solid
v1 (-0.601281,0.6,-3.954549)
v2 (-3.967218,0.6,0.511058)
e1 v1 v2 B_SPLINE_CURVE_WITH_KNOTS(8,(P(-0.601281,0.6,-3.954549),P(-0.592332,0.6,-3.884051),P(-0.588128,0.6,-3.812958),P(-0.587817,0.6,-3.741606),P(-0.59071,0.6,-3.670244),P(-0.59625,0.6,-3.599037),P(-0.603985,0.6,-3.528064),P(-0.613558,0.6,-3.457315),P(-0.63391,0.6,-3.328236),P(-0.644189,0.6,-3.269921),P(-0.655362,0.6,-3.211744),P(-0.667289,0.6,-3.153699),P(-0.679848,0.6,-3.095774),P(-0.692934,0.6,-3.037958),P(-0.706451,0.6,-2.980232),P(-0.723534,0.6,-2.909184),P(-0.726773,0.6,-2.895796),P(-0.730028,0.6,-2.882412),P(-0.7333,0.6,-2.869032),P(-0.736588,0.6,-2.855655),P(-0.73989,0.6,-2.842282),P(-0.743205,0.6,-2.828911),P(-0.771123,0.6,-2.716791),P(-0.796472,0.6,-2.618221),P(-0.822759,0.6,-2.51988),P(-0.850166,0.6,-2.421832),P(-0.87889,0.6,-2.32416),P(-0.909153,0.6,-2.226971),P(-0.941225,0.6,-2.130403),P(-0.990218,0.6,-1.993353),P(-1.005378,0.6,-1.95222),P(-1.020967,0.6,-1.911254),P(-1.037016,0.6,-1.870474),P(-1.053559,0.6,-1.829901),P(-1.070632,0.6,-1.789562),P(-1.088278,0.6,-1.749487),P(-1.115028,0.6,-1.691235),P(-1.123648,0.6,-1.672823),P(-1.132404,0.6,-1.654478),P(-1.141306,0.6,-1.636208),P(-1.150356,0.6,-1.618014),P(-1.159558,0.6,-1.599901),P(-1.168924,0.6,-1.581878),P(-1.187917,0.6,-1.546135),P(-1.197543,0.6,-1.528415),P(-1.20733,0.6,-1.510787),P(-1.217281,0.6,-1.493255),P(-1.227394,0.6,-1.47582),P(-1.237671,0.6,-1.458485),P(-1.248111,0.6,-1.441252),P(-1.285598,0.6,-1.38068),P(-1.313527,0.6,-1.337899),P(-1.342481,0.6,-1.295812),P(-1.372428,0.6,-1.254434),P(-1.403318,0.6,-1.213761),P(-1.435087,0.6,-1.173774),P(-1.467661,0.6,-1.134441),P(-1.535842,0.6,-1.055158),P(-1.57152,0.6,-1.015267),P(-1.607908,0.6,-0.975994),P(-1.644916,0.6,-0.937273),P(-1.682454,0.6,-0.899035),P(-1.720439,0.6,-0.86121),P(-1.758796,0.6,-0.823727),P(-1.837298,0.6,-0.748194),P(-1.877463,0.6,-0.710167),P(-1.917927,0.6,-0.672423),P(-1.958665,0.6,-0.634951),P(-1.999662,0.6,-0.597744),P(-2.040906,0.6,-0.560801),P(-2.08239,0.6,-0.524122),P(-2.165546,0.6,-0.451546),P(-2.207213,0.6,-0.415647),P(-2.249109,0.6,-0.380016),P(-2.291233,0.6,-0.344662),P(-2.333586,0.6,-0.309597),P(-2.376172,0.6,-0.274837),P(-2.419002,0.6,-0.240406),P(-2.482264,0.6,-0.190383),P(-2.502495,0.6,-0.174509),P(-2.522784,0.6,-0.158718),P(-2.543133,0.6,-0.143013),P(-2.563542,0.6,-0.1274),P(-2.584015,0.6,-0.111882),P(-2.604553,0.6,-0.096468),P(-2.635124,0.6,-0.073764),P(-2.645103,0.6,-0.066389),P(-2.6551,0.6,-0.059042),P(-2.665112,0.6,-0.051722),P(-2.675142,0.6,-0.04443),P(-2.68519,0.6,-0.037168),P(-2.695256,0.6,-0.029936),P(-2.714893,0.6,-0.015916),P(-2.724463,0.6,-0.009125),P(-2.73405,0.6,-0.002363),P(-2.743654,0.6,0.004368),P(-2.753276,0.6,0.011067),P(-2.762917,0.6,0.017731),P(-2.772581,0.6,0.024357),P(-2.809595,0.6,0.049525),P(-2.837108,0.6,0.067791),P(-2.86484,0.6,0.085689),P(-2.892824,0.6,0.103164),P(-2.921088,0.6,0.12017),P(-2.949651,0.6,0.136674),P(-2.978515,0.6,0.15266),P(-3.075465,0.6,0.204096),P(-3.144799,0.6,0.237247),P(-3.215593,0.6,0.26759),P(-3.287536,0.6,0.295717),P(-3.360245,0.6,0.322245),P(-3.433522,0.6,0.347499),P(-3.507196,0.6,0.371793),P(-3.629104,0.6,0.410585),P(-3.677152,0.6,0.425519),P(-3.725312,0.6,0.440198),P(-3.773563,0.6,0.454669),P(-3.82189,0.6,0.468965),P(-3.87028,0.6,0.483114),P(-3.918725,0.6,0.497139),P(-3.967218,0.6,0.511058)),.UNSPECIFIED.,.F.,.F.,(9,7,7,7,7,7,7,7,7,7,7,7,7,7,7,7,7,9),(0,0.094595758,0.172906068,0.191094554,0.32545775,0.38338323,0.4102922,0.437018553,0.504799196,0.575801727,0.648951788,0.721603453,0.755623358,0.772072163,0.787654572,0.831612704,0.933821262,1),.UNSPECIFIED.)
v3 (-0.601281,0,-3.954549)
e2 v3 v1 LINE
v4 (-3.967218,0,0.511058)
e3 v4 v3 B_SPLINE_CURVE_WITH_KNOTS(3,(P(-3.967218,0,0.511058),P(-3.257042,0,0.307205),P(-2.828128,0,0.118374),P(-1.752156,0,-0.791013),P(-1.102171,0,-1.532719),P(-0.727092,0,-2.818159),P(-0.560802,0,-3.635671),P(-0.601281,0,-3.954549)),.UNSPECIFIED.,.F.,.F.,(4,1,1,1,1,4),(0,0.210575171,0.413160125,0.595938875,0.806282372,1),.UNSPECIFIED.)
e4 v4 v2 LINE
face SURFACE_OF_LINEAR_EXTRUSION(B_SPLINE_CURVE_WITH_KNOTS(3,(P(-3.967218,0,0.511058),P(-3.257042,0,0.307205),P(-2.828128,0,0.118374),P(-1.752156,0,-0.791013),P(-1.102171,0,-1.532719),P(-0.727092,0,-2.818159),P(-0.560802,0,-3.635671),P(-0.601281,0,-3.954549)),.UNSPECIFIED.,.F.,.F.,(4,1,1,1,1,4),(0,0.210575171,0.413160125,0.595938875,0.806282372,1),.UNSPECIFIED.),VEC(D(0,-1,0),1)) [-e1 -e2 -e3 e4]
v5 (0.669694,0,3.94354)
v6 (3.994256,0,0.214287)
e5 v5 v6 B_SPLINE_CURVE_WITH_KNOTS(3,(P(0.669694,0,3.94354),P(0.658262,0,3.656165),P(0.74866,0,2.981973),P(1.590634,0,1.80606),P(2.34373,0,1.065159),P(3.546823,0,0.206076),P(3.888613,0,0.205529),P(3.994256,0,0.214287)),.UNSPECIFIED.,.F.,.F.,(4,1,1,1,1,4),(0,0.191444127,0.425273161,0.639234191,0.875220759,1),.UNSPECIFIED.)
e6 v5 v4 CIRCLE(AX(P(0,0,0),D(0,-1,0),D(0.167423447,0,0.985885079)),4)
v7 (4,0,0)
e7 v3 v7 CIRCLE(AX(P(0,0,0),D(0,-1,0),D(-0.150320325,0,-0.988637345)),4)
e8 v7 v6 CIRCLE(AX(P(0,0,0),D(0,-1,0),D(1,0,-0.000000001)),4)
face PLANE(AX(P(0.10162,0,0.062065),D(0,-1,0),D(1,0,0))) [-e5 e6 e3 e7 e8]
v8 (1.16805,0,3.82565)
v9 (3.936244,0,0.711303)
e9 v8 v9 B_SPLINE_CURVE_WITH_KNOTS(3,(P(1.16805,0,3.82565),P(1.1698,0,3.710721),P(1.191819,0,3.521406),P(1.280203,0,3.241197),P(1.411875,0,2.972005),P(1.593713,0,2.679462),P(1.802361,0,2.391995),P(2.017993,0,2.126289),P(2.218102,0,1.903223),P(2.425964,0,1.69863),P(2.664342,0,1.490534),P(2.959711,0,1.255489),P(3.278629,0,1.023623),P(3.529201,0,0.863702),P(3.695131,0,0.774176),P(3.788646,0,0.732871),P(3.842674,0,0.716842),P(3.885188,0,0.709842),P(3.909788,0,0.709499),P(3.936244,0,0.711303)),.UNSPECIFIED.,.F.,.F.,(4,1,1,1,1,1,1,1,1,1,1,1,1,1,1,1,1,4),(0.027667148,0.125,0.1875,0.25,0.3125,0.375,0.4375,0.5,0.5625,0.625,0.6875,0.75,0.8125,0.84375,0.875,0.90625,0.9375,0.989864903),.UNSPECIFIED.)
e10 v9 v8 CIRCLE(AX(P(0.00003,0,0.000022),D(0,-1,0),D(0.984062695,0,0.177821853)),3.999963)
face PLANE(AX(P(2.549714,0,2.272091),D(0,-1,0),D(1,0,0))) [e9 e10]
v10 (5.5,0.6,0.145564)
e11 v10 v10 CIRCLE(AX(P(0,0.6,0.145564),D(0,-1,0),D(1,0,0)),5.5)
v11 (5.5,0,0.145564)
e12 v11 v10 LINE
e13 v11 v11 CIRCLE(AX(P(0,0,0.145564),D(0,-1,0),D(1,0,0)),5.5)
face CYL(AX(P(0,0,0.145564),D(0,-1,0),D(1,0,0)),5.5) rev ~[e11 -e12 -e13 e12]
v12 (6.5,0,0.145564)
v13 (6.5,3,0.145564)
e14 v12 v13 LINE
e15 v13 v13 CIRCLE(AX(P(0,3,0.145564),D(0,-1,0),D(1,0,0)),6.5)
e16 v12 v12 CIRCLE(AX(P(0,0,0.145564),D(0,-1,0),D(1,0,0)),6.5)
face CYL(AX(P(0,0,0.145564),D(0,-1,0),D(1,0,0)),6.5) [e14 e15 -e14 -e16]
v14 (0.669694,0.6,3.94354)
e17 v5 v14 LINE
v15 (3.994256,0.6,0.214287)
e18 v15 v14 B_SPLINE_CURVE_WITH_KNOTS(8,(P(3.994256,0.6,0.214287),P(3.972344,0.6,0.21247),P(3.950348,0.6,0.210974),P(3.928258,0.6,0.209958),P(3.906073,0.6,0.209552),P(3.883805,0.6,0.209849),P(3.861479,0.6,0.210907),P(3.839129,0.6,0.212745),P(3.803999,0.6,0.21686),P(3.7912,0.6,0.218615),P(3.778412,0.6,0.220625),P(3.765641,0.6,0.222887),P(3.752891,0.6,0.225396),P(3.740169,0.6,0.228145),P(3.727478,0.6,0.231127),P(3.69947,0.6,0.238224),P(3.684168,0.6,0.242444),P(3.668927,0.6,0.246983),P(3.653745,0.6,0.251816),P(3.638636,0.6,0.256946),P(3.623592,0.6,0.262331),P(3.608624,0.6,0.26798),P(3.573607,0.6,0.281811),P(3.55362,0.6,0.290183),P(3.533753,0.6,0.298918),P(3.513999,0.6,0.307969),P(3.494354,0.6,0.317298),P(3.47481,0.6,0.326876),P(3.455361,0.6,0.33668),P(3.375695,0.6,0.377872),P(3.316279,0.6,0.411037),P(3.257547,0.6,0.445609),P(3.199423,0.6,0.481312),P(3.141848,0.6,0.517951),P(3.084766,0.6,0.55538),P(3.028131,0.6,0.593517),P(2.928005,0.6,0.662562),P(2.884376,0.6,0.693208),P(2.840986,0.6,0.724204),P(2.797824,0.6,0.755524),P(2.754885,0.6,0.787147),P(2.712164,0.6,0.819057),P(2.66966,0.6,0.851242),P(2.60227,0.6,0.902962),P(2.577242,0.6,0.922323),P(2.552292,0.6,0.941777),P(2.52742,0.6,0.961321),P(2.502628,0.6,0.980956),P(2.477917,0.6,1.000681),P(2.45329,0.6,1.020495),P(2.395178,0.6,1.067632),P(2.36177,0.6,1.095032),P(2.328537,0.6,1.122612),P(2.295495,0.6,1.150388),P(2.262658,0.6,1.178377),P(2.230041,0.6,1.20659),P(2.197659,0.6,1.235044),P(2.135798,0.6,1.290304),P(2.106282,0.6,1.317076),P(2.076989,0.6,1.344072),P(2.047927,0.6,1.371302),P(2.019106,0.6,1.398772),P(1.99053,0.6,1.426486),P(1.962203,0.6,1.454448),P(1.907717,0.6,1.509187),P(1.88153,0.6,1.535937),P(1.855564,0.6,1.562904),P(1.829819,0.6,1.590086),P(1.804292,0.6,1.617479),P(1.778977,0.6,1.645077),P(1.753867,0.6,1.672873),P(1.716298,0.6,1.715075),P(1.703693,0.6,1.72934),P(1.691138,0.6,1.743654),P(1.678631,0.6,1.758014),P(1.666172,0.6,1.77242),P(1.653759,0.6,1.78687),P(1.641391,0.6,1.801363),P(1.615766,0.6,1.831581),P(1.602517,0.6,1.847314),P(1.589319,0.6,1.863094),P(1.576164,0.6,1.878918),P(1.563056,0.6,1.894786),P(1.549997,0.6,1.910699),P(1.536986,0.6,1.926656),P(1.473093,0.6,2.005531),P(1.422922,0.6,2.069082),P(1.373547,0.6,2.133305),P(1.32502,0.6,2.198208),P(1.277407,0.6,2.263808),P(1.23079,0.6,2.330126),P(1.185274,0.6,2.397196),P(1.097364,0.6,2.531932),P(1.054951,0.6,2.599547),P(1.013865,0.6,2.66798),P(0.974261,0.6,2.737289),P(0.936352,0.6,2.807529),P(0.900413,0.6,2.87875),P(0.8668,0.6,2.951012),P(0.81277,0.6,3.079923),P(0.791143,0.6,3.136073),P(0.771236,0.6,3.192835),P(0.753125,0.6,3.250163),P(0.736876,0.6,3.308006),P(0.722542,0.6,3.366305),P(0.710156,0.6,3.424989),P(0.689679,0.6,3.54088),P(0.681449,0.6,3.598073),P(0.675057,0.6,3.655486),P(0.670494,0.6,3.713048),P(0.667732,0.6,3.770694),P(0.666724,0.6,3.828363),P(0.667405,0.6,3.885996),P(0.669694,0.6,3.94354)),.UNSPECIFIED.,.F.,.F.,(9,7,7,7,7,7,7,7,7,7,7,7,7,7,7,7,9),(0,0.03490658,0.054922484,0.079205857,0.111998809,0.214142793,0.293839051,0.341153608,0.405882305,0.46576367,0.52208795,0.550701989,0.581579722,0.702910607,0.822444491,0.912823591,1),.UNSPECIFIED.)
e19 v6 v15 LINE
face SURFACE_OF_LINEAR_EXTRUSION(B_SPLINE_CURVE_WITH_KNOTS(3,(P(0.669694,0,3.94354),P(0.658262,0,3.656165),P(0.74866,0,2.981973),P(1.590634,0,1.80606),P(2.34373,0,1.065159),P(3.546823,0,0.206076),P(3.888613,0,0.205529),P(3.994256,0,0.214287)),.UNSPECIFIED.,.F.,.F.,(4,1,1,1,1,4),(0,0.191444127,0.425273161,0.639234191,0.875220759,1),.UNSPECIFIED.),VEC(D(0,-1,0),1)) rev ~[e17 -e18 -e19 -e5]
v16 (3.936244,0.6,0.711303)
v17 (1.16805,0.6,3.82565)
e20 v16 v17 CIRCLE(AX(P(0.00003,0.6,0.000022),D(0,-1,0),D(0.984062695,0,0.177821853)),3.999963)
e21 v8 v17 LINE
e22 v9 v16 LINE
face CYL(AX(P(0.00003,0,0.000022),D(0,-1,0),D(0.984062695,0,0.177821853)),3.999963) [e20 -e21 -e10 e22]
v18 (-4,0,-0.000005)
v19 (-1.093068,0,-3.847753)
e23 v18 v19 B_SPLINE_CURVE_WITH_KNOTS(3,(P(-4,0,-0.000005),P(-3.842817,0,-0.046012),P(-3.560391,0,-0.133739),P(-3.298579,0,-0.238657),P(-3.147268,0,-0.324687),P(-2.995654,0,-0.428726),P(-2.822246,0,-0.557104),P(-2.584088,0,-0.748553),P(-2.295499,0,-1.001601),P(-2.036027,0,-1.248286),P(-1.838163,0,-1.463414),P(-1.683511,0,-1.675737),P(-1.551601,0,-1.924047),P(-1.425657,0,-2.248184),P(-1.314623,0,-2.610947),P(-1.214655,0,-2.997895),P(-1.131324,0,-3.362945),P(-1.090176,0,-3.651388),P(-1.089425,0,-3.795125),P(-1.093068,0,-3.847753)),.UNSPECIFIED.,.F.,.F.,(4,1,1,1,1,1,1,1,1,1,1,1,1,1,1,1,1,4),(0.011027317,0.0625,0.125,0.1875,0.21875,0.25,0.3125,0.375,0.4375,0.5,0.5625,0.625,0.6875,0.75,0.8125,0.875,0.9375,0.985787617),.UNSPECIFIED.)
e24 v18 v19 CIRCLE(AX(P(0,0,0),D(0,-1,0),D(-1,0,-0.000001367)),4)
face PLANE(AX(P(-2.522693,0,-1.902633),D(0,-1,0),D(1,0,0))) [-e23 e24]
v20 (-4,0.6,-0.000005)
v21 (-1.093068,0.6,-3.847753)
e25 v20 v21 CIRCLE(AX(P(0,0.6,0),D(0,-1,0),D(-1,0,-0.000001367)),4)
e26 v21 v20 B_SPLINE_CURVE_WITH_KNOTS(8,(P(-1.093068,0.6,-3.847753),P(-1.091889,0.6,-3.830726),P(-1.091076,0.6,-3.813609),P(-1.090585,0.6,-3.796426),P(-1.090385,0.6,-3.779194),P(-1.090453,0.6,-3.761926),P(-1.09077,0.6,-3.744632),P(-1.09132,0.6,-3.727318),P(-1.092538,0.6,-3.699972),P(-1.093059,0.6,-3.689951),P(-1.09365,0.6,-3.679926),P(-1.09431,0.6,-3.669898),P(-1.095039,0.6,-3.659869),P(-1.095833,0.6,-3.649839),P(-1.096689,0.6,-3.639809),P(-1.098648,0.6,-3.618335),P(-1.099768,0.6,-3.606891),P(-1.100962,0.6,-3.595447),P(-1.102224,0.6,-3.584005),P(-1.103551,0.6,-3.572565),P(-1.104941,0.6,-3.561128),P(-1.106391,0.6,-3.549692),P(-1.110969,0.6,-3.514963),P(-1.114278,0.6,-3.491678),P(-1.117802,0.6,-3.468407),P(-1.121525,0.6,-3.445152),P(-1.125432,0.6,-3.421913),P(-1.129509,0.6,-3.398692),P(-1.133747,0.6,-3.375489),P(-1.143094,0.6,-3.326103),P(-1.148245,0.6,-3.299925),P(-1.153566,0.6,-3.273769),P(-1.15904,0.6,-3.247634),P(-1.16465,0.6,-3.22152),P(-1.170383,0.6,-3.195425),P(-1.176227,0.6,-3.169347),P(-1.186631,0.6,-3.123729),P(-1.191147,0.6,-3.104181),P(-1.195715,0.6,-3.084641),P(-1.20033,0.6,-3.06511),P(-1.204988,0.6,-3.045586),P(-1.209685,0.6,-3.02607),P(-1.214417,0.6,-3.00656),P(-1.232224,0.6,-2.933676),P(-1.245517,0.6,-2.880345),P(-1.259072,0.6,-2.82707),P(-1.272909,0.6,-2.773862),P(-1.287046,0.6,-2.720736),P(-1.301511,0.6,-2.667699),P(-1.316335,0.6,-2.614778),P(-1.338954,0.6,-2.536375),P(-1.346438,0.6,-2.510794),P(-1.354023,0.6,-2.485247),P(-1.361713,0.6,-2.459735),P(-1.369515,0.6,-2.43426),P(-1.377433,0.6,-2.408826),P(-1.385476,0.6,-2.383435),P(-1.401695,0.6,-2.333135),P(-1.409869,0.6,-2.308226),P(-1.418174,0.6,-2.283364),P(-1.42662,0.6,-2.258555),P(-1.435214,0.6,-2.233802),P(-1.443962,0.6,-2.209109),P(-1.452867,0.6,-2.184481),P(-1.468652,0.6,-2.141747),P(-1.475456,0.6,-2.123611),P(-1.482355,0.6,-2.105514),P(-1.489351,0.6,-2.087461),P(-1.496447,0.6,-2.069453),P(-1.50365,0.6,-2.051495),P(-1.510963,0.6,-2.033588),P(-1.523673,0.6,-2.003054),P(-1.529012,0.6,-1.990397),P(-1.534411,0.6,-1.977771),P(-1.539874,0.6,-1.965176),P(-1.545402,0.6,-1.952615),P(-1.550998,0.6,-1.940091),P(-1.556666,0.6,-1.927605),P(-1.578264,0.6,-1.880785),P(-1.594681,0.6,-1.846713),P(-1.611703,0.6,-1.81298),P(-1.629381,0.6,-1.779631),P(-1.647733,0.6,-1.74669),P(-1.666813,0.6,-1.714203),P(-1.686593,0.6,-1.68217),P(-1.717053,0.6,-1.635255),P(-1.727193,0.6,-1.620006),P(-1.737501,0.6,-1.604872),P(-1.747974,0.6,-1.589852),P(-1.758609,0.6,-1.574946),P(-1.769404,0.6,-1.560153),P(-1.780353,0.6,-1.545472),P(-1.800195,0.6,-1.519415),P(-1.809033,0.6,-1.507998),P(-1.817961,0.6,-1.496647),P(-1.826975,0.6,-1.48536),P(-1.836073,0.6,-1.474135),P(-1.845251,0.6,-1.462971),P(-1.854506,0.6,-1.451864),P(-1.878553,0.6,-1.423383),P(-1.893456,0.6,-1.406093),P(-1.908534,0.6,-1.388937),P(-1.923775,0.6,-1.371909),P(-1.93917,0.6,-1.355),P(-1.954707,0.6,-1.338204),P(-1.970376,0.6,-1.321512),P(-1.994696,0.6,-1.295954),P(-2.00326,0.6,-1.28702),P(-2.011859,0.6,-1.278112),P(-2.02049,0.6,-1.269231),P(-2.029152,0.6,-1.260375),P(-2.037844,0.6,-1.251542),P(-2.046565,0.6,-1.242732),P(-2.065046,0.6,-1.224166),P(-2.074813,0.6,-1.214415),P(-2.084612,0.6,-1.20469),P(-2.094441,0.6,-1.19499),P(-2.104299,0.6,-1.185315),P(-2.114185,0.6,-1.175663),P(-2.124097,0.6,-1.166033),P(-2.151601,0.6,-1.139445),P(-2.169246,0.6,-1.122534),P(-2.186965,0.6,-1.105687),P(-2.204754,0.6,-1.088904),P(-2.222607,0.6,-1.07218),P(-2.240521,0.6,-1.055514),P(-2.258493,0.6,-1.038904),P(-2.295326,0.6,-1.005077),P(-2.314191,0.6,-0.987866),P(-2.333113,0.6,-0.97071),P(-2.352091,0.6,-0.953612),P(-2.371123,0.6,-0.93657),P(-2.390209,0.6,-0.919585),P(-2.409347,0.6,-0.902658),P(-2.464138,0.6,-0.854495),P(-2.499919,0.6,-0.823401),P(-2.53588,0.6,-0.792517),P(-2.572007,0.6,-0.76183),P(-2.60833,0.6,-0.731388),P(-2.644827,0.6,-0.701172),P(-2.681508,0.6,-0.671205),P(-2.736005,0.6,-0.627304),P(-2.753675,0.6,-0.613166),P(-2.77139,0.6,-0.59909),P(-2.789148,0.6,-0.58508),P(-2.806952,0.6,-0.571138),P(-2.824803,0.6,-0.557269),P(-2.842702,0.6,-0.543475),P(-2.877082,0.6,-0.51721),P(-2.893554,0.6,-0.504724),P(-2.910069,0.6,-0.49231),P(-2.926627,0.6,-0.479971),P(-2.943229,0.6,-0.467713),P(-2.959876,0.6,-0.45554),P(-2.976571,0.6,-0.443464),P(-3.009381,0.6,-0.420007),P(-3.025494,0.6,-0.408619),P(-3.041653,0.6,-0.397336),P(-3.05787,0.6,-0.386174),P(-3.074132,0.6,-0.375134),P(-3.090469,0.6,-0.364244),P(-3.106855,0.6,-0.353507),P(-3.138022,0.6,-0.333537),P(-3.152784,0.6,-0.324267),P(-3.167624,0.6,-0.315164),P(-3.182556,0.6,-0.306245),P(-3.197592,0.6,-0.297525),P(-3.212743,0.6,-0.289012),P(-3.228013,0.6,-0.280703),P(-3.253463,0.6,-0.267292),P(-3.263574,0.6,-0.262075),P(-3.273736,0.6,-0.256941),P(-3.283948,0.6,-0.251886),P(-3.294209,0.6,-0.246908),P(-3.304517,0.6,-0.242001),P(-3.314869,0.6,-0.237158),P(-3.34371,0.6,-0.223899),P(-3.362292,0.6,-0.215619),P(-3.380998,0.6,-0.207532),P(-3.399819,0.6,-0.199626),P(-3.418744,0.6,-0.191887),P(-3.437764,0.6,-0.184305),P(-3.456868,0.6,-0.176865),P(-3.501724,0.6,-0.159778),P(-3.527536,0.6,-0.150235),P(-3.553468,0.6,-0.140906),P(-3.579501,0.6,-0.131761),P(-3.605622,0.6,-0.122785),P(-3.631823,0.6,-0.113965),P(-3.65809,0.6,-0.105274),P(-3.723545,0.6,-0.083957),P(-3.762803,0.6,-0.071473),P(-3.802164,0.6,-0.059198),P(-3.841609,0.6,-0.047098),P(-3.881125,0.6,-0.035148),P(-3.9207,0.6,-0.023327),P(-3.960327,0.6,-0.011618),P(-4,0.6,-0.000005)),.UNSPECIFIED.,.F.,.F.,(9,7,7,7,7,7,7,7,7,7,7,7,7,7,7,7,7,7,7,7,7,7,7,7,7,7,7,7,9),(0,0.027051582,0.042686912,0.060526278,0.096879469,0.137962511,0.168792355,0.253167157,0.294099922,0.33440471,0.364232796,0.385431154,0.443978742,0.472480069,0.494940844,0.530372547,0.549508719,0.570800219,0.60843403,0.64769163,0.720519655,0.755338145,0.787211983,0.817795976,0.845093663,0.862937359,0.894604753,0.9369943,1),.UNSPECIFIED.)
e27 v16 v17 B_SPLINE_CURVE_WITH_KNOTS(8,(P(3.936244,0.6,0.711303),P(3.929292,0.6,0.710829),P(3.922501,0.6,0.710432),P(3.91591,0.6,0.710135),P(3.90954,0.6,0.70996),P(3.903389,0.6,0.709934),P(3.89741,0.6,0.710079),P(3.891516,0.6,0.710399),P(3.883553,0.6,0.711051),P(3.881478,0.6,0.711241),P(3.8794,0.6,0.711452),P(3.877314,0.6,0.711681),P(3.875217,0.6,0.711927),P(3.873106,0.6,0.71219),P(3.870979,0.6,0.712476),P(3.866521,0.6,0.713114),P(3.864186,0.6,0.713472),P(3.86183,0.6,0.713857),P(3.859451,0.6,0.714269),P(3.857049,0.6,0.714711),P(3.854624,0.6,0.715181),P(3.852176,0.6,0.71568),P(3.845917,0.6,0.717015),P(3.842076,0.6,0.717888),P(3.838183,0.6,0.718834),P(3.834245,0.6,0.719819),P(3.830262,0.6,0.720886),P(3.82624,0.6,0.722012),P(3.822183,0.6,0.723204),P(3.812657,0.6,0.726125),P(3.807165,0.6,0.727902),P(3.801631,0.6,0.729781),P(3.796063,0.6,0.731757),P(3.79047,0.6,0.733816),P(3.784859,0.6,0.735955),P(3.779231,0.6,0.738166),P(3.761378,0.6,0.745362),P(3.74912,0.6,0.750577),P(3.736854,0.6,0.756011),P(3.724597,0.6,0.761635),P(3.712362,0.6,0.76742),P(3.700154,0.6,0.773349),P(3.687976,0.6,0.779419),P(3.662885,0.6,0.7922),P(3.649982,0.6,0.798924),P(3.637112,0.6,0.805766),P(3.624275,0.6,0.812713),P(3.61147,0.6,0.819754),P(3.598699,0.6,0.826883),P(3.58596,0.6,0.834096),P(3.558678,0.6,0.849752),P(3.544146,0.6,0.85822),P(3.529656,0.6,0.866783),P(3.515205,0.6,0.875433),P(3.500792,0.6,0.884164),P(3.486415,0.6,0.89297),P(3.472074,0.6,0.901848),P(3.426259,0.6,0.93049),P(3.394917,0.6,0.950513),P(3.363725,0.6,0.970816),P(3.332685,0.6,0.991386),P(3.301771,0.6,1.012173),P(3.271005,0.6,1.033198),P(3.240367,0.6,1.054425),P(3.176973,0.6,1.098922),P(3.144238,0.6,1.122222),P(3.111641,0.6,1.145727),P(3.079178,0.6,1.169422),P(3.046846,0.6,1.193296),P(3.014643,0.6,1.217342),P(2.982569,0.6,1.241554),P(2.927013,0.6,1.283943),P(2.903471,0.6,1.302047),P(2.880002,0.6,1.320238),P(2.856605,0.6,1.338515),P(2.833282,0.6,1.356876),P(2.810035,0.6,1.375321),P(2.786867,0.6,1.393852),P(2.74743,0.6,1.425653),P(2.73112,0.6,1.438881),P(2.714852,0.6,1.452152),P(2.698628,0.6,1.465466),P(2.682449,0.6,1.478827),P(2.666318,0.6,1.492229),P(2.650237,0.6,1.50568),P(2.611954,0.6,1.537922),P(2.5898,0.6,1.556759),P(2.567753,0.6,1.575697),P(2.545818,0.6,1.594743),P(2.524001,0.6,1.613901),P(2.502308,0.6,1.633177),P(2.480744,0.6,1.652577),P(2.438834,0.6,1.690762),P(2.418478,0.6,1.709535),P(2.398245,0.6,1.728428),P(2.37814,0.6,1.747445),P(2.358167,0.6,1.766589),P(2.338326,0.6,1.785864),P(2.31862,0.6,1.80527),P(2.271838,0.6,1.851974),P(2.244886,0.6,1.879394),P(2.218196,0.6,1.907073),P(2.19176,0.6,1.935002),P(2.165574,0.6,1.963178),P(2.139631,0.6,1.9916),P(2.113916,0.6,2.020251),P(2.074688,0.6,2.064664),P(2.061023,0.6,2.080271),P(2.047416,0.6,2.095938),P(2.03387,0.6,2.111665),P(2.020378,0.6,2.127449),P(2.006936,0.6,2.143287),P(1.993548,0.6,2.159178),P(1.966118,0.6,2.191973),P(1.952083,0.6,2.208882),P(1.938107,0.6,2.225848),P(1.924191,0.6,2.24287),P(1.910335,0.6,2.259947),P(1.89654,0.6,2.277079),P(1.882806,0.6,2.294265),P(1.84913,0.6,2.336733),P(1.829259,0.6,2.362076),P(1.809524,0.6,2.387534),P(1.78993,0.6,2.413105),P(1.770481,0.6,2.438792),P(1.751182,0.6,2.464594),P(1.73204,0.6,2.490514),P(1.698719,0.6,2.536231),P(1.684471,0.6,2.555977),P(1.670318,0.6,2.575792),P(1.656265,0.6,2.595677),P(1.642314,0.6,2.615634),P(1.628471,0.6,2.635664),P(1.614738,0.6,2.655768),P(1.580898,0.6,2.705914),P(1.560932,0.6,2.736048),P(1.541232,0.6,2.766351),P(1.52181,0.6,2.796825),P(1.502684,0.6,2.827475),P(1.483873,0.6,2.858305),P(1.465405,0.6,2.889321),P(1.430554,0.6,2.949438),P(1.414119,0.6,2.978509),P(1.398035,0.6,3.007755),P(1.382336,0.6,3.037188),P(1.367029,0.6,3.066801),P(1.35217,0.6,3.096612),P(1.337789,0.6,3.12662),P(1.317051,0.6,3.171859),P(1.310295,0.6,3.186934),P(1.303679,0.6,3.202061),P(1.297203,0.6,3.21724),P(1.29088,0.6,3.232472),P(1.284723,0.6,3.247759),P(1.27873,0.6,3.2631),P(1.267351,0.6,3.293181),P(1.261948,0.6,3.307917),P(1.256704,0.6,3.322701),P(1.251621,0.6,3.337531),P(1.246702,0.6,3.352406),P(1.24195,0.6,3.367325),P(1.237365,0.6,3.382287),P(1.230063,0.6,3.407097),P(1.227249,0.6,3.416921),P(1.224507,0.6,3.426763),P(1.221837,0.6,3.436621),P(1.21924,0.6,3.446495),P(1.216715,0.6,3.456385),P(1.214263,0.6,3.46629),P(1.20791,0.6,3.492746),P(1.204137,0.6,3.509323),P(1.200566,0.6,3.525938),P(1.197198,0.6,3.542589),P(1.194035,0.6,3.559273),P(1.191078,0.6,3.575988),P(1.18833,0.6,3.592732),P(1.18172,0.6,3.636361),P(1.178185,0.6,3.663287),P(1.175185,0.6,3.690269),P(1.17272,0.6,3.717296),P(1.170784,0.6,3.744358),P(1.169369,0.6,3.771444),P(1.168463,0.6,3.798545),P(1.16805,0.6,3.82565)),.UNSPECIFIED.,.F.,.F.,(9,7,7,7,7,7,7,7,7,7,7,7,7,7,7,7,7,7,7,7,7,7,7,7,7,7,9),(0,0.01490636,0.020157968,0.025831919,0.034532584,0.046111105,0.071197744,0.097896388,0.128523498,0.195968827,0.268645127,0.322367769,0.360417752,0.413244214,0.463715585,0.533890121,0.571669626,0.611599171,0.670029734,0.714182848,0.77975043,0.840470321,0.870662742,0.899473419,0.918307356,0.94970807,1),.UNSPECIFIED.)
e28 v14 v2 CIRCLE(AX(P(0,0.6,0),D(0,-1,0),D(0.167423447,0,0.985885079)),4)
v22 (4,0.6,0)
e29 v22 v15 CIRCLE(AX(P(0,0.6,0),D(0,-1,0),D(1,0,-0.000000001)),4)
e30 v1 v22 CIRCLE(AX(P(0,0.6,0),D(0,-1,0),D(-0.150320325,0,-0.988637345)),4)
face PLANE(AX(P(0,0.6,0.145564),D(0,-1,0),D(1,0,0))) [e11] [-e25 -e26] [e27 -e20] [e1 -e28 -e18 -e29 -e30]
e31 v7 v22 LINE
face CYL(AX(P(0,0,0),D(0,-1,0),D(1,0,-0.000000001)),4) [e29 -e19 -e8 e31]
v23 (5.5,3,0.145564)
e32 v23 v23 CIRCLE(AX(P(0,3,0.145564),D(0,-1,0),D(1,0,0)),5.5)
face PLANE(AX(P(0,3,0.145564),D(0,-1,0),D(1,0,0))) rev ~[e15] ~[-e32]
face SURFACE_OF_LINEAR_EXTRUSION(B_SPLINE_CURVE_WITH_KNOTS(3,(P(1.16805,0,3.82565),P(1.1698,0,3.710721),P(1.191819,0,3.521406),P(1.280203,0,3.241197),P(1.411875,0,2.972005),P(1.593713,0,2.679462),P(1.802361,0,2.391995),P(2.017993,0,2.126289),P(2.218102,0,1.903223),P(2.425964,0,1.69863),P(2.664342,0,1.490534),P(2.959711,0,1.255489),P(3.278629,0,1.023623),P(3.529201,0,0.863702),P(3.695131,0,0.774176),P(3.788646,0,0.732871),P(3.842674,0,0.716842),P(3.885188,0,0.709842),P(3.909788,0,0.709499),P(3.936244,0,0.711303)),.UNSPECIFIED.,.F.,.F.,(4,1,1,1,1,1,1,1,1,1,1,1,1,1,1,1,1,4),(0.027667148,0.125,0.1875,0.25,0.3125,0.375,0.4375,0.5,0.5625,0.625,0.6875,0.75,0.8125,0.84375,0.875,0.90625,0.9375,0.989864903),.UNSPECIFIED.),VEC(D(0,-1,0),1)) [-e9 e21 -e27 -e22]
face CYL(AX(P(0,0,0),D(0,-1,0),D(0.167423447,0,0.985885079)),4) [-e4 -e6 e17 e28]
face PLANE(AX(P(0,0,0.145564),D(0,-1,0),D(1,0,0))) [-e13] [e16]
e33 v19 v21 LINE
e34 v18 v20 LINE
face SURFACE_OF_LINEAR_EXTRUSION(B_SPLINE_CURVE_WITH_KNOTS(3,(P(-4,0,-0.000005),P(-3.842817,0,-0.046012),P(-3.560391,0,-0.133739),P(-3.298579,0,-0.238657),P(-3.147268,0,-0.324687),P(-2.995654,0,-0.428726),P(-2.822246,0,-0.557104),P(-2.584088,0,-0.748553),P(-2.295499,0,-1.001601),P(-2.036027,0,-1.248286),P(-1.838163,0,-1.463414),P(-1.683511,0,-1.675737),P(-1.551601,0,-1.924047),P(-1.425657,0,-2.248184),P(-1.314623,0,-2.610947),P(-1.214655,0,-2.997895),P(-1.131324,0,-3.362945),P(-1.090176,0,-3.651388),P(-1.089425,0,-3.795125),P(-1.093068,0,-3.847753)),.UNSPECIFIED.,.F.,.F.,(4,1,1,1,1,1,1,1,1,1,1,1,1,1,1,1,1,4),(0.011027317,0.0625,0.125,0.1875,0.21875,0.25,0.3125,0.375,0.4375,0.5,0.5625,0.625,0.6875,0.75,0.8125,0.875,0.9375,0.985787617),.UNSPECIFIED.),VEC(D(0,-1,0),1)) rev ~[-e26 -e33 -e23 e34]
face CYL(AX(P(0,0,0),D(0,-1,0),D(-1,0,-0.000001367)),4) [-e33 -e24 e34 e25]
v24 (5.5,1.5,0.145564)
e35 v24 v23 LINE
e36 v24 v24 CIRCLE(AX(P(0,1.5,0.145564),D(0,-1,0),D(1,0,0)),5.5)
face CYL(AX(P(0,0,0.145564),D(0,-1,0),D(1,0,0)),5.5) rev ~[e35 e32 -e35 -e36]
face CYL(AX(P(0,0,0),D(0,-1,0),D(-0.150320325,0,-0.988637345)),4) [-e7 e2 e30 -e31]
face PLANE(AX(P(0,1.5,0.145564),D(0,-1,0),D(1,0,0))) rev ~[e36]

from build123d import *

# Parameters (mm, degrees)
F1_R     = 6.5
F1_R_2   = 5.5
F3_DEPTH = 3
F4_DEPTH = 1.5
F5_DEPTH = 0.6
F6_DEPTH = 1
F7_DEPTH = 1
F8_DEPTH = 1


# Not quite as in the source:
# - ends of sketch curves that miss each other by under 0.0002 mm in the source are joined
# - the dataset's text gives a spline's control points without its knots; the knots are read off the source's solid


with BuildPart() as f3:
    # F1 (on Front) → F3 (new body)
    with BuildSketch(Plane.XZ):
        with Locations((1.996e-07, 0.145563783)):
            Circle(F1_R)
        with Locations((1.996e-07, 0.145563783)):
            Circle(F1_R_2, mode=Mode.SUBTRACT)
    extrude(amount=-F3_DEPTH)

    # F0 (on Front) + F1 (on Front) → F4 (join)
    with BuildSketch(Plane.XZ):
        with BuildLine():
            add(Edge.make_bspline(
                [(-1.4633628161, -3.8408698747), (-0.8618942381, -4.0797628795), (1.7775925035, -4.2725148883), (2.1266039699, -2.4883414841), (2.1792066492, -0.8570773415), (2.1261946367, 0.7652860278), (1.8591945487, 1.4152828688), (2.1073079889, 1.4090746613), (2.1070261206, 1.5973545621), (1.8482611221, 1.6571502022), (1.9106924097, 2.0013449435), (1.883292753, 2.4559971082), (1.4530608962, 2.5796008165), (1.3486705812, 2.982608362), (0.9522813685, 3.1051443516), (0.6376593936, 3.1670181532), (0.4331394013, 3.4063180529), (0.6426984155, 3.8176132891), (0.3981993423, 4.2634916825), (-0.0062082347, 4.3047771669), (-0.3006353253, 4.2313929361), (-0.6271454426, 3.9609581822), (-0.5601436399, 3.6082200906), (-0.4158755178, 3.3585569408), (-0.6804152796, 3.1141950016), (-1.0068060059, 3.1249120402), (-1.1963426018, 2.8920399235), (-1.3913162215, 2.8683333491), (-1.3804892819, 2.6236576239), (-1.7077578499, 2.7520009173), (-1.8276300328, 2.3206081403), (-1.8540486856, 2.0110635487), (-1.8641412125, 1.6986764558), (-2.1169141262, 1.6232767981), (-2.0818952059, 1.4062115725), (-1.9001690611, 1.4703026422), (-2.1146422172, 0.8809803752), (-2.0979861646, 0.2234423606), (-2.2011740498, -0.523800053), (-2.1724225003, -1.2230030424), (-2.1779022447, -2.5473945892), (-1.9120269544, -3.4285716282), (-1.7403824301, -3.7308424346), (-1.4633628161, -3.8408698747)],
                knots=[0, 0, 0, 0, 0.0614284178, 0.105210304, 0.1528188952, 0.1998934744, 0.2260159491, 0.2394622475, 0.2521789794, 0.2685961982, 0.2887254165, 0.3121716538, 0.3345624104, 0.3566054098, 0.3791085644, 0.3997521347, 0.4178904262, 0.4412373911, 0.4652934844, 0.487296569, 0.5074239254, 0.5296841222, 0.5504706917, 0.5687295132, 0.5882529988, 0.6087082105, 0.6278548545, 0.642595893, 0.6569229468, 0.674176944, 0.6961346625, 0.7176137944, 0.736576695, 0.7535032789, 0.767308469, 0.7778501968, 0.8029343179, 0.8341377518, 0.8649078271, 0.8956216456, 0.9374997946, 0.9717077879, 1, 1, 1, 1], degree=3))
        make_face()
    with BuildSketch(Plane.XZ):
        with Locations((1.996e-07, 0.145563783)):
            Circle(F1_R_2)
    extrude(amount=-F4_DEPTH)

    # F1 (on Front) + F0 (on Front) → F5 (cut)
    with BuildSketch(Plane.XZ):
        with Locations((1.996e-07, 0.145563783)):
            Circle(F1_R_2)
    with BuildSketch(Plane.XZ):
        with BuildLine():
            add(Edge.make_bspline(
                [(-1.4633628161, -3.8408698747), (-0.8618942381, -4.0797628795), (1.7775925035, -4.2725148883), (2.1266039699, -2.4883414841), (2.1792066492, -0.8570773415), (2.1261946367, 0.7652860278), (1.8591945487, 1.4152828688), (2.1073079889, 1.4090746613), (2.1070261206, 1.5973545621), (1.8482611221, 1.6571502022), (1.9106924097, 2.0013449435), (1.883292753, 2.4559971082), (1.4530608962, 2.5796008165), (1.3486705812, 2.982608362), (0.9522813685, 3.1051443516), (0.6376593936, 3.1670181532), (0.4331394013, 3.4063180529), (0.6426984155, 3.8176132891), (0.3981993423, 4.2634916825), (-0.0062082347, 4.3047771669), (-0.3006353253, 4.2313929361), (-0.6271454426, 3.9609581822), (-0.5601436399, 3.6082200906), (-0.4158755178, 3.3585569408), (-0.6804152796, 3.1141950016), (-1.0068060059, 3.1249120402), (-1.1963426018, 2.8920399235), (-1.3913162215, 2.8683333491), (-1.3804892819, 2.6236576239), (-1.7077578499, 2.7520009173), (-1.8276300328, 2.3206081403), (-1.8540486856, 2.0110635487), (-1.8641412125, 1.6986764558), (-2.1169141262, 1.6232767981), (-2.0818952059, 1.4062115725), (-1.9001690611, 1.4703026422), (-2.1146422172, 0.8809803752), (-2.0979861646, 0.2234423606), (-2.2011740498, -0.523800053), (-2.1724225003, -1.2230030424), (-2.1779022447, -2.5473945892), (-1.9120269544, -3.4285716282), (-1.7403824301, -3.7308424346), (-1.4633628161, -3.8408698747)],
                knots=[0, 0, 0, 0, 0.0614284178, 0.105210304, 0.1528188952, 0.1998934744, 0.2260159491, 0.2394622475, 0.2521789794, 0.2685961982, 0.2887254165, 0.3121716538, 0.3345624104, 0.3566054098, 0.3791085644, 0.3997521347, 0.4178904262, 0.4412373911, 0.4652934844, 0.487296569, 0.5074239254, 0.5296841222, 0.5504706917, 0.5687295132, 0.5882529988, 0.6087082105, 0.6278548545, 0.642595893, 0.6569229468, 0.674176944, 0.6961346625, 0.7176137944, 0.736576695, 0.7535032789, 0.767308469, 0.7778501968, 0.8029343179, 0.8341377518, 0.8649078271, 0.8956216456, 0.9374997946, 0.9717077879, 1, 1, 1, 1], degree=3))
        make_face()
    extrude(amount=-F5_DEPTH, mode=Mode.SUBTRACT)

    # F2 (on face) → F6 (join)
    with BuildSketch(Plane.XZ):
        with BuildLine():
            ThreePointArc((-0.6012813019, -3.9545493796), (2.6071895589, -3.0335725809), (4, 0))
            ThreePointArc((4, 0), (3.9985637458, 0.1071819529), (3.9942560145, 0.2142869356))
            add(Edge.make_bspline(
                [(0.6696937898, 3.9435403165), (0.6582621326, 3.6561648877), (0.748660393, 2.9819733395), (1.5906344476, 1.8060597163), (2.343729672, 1.0651587443), (3.5468225291, 0.2060757034), (3.8886131662, 0.2055288721), (3.9942560145, 0.2142869356)],
                knots=[0, 0, 0, 0, 0.1914441273, 0.4252731611, 0.6392341909, 0.8752207587, 1, 1, 1, 1], degree=3))
            ThreePointArc((0.6696937898, 3.9435403165), (-2.3798948862, 3.2149806112), (-3.9672180841, 0.5110583855))
            add(Edge.make_bspline(
                [(-3.9672180841, 0.5110583855), (-3.2570424953, 0.3072051337), (-2.8281277347, 0.1183736874), (-1.7521563519, -0.7910134795), (-1.1021707585, -1.5327189765), (-0.7270922455, -2.8181587186), (-0.5608016797, -3.6356710711), (-0.6012813019, -3.9545493796)],
                knots=[0, 0, 0, 0, 0.2105751714, 0.4131601255, 0.5959388752, 0.8062823722, 1, 1, 1, 1], degree=3))
        make_face()
    extrude(amount=-F6_DEPTH)

    # F2 (on face) → F7 (join)
    with BuildSketch(Plane.XZ):
        with BuildLine():
            ThreePointArc((-4, -5.4666e-06), (-3.1915709466, -2.4111978128), (-1.0930678122, -3.8477529492))
            add(Edge.make_bspline(
                [(-4, -5.4666e-06), (-3.8428166733, -0.0460123585), (-3.5603914777, -0.133738653), (-3.2985794295, -0.2386569495), (-3.1472677408, -0.3246867621), (-2.9956539452, -0.4287257802), (-2.8222463482, -0.557104318), (-2.5840878529, -0.7485534177), (-2.2954985412, -1.0016010876), (-2.036026908, -1.2482860637), (-1.8381629968, -1.4634144564), (-1.6835113586, -1.6757370022), (-1.5516009911, -1.9240469669), (-1.4256566149, -2.248184411), (-1.3146225307, -2.6109466281), (-1.2146554645, -2.9978949757), (-1.1313238625, -3.3629451013), (-1.0901758206, -3.651388342), (-1.0894246902, -3.7951254649), (-1.0930678122, -3.8477529492)],
                knots=[0.0110273175, 0.0110273175, 0.0110273175, 0.0110273175, 0.0625, 0.125, 0.1875, 0.21875, 0.25, 0.3125, 0.375, 0.4375, 0.5, 0.5625, 0.625, 0.6875, 0.75, 0.8125, 0.875, 0.9375, 0.9857876166, 0.9857876166, 0.9857876166, 0.9857876166], degree=3))
        make_face()
    extrude(amount=-F7_DEPTH)

    # F2 (on face) → F8 (join)
    with BuildSketch(Plane.XZ):
        with BuildLine():
            add(Edge.make_bspline(
                [(1.1680500995, 3.8256503793), (1.1697995693, 3.7107206965), (1.1918189199, 3.5214057887), (1.2802032379, 3.2411969251), (1.4118748463, 2.9720045965), (1.5937127908, 2.679461535), (1.8023614597, 2.3919954972), (2.0179930746, 2.1262894096), (2.2181018419, 1.9032227167), (2.4259640622, 1.6986298437), (2.6643415193, 1.4905337309), (2.9597106264, 1.2554890784), (3.2786287368, 1.0236228812), (3.5292013722, 0.8637020638), (3.6951311872, 0.7741756792), (3.7886457426, 0.7328710188), (3.8426743367, 0.7168415355), (3.8851876888, 0.7098421735), (3.9097876849, 0.7094994811), (3.9362444503, 0.7113026549)],
                knots=[0.0276671484, 0.0276671484, 0.0276671484, 0.0276671484, 0.125, 0.1875, 0.25, 0.3125, 0.375, 0.4375, 0.5, 0.5625, 0.625, 0.6875, 0.75, 0.8125, 0.84375, 0.875, 0.90625, 0.9375, 0.9898649034, 0.9898649034, 0.9898649034, 0.9898649034], degree=3))
            ThreePointArc((3.9362444503, 0.7113026549), (2.989694007, 2.6573915302), (1.1680500995, 3.8256503793))
        make_face()
    extrude(amount=-F8_DEPTH)


solid = f3.part
